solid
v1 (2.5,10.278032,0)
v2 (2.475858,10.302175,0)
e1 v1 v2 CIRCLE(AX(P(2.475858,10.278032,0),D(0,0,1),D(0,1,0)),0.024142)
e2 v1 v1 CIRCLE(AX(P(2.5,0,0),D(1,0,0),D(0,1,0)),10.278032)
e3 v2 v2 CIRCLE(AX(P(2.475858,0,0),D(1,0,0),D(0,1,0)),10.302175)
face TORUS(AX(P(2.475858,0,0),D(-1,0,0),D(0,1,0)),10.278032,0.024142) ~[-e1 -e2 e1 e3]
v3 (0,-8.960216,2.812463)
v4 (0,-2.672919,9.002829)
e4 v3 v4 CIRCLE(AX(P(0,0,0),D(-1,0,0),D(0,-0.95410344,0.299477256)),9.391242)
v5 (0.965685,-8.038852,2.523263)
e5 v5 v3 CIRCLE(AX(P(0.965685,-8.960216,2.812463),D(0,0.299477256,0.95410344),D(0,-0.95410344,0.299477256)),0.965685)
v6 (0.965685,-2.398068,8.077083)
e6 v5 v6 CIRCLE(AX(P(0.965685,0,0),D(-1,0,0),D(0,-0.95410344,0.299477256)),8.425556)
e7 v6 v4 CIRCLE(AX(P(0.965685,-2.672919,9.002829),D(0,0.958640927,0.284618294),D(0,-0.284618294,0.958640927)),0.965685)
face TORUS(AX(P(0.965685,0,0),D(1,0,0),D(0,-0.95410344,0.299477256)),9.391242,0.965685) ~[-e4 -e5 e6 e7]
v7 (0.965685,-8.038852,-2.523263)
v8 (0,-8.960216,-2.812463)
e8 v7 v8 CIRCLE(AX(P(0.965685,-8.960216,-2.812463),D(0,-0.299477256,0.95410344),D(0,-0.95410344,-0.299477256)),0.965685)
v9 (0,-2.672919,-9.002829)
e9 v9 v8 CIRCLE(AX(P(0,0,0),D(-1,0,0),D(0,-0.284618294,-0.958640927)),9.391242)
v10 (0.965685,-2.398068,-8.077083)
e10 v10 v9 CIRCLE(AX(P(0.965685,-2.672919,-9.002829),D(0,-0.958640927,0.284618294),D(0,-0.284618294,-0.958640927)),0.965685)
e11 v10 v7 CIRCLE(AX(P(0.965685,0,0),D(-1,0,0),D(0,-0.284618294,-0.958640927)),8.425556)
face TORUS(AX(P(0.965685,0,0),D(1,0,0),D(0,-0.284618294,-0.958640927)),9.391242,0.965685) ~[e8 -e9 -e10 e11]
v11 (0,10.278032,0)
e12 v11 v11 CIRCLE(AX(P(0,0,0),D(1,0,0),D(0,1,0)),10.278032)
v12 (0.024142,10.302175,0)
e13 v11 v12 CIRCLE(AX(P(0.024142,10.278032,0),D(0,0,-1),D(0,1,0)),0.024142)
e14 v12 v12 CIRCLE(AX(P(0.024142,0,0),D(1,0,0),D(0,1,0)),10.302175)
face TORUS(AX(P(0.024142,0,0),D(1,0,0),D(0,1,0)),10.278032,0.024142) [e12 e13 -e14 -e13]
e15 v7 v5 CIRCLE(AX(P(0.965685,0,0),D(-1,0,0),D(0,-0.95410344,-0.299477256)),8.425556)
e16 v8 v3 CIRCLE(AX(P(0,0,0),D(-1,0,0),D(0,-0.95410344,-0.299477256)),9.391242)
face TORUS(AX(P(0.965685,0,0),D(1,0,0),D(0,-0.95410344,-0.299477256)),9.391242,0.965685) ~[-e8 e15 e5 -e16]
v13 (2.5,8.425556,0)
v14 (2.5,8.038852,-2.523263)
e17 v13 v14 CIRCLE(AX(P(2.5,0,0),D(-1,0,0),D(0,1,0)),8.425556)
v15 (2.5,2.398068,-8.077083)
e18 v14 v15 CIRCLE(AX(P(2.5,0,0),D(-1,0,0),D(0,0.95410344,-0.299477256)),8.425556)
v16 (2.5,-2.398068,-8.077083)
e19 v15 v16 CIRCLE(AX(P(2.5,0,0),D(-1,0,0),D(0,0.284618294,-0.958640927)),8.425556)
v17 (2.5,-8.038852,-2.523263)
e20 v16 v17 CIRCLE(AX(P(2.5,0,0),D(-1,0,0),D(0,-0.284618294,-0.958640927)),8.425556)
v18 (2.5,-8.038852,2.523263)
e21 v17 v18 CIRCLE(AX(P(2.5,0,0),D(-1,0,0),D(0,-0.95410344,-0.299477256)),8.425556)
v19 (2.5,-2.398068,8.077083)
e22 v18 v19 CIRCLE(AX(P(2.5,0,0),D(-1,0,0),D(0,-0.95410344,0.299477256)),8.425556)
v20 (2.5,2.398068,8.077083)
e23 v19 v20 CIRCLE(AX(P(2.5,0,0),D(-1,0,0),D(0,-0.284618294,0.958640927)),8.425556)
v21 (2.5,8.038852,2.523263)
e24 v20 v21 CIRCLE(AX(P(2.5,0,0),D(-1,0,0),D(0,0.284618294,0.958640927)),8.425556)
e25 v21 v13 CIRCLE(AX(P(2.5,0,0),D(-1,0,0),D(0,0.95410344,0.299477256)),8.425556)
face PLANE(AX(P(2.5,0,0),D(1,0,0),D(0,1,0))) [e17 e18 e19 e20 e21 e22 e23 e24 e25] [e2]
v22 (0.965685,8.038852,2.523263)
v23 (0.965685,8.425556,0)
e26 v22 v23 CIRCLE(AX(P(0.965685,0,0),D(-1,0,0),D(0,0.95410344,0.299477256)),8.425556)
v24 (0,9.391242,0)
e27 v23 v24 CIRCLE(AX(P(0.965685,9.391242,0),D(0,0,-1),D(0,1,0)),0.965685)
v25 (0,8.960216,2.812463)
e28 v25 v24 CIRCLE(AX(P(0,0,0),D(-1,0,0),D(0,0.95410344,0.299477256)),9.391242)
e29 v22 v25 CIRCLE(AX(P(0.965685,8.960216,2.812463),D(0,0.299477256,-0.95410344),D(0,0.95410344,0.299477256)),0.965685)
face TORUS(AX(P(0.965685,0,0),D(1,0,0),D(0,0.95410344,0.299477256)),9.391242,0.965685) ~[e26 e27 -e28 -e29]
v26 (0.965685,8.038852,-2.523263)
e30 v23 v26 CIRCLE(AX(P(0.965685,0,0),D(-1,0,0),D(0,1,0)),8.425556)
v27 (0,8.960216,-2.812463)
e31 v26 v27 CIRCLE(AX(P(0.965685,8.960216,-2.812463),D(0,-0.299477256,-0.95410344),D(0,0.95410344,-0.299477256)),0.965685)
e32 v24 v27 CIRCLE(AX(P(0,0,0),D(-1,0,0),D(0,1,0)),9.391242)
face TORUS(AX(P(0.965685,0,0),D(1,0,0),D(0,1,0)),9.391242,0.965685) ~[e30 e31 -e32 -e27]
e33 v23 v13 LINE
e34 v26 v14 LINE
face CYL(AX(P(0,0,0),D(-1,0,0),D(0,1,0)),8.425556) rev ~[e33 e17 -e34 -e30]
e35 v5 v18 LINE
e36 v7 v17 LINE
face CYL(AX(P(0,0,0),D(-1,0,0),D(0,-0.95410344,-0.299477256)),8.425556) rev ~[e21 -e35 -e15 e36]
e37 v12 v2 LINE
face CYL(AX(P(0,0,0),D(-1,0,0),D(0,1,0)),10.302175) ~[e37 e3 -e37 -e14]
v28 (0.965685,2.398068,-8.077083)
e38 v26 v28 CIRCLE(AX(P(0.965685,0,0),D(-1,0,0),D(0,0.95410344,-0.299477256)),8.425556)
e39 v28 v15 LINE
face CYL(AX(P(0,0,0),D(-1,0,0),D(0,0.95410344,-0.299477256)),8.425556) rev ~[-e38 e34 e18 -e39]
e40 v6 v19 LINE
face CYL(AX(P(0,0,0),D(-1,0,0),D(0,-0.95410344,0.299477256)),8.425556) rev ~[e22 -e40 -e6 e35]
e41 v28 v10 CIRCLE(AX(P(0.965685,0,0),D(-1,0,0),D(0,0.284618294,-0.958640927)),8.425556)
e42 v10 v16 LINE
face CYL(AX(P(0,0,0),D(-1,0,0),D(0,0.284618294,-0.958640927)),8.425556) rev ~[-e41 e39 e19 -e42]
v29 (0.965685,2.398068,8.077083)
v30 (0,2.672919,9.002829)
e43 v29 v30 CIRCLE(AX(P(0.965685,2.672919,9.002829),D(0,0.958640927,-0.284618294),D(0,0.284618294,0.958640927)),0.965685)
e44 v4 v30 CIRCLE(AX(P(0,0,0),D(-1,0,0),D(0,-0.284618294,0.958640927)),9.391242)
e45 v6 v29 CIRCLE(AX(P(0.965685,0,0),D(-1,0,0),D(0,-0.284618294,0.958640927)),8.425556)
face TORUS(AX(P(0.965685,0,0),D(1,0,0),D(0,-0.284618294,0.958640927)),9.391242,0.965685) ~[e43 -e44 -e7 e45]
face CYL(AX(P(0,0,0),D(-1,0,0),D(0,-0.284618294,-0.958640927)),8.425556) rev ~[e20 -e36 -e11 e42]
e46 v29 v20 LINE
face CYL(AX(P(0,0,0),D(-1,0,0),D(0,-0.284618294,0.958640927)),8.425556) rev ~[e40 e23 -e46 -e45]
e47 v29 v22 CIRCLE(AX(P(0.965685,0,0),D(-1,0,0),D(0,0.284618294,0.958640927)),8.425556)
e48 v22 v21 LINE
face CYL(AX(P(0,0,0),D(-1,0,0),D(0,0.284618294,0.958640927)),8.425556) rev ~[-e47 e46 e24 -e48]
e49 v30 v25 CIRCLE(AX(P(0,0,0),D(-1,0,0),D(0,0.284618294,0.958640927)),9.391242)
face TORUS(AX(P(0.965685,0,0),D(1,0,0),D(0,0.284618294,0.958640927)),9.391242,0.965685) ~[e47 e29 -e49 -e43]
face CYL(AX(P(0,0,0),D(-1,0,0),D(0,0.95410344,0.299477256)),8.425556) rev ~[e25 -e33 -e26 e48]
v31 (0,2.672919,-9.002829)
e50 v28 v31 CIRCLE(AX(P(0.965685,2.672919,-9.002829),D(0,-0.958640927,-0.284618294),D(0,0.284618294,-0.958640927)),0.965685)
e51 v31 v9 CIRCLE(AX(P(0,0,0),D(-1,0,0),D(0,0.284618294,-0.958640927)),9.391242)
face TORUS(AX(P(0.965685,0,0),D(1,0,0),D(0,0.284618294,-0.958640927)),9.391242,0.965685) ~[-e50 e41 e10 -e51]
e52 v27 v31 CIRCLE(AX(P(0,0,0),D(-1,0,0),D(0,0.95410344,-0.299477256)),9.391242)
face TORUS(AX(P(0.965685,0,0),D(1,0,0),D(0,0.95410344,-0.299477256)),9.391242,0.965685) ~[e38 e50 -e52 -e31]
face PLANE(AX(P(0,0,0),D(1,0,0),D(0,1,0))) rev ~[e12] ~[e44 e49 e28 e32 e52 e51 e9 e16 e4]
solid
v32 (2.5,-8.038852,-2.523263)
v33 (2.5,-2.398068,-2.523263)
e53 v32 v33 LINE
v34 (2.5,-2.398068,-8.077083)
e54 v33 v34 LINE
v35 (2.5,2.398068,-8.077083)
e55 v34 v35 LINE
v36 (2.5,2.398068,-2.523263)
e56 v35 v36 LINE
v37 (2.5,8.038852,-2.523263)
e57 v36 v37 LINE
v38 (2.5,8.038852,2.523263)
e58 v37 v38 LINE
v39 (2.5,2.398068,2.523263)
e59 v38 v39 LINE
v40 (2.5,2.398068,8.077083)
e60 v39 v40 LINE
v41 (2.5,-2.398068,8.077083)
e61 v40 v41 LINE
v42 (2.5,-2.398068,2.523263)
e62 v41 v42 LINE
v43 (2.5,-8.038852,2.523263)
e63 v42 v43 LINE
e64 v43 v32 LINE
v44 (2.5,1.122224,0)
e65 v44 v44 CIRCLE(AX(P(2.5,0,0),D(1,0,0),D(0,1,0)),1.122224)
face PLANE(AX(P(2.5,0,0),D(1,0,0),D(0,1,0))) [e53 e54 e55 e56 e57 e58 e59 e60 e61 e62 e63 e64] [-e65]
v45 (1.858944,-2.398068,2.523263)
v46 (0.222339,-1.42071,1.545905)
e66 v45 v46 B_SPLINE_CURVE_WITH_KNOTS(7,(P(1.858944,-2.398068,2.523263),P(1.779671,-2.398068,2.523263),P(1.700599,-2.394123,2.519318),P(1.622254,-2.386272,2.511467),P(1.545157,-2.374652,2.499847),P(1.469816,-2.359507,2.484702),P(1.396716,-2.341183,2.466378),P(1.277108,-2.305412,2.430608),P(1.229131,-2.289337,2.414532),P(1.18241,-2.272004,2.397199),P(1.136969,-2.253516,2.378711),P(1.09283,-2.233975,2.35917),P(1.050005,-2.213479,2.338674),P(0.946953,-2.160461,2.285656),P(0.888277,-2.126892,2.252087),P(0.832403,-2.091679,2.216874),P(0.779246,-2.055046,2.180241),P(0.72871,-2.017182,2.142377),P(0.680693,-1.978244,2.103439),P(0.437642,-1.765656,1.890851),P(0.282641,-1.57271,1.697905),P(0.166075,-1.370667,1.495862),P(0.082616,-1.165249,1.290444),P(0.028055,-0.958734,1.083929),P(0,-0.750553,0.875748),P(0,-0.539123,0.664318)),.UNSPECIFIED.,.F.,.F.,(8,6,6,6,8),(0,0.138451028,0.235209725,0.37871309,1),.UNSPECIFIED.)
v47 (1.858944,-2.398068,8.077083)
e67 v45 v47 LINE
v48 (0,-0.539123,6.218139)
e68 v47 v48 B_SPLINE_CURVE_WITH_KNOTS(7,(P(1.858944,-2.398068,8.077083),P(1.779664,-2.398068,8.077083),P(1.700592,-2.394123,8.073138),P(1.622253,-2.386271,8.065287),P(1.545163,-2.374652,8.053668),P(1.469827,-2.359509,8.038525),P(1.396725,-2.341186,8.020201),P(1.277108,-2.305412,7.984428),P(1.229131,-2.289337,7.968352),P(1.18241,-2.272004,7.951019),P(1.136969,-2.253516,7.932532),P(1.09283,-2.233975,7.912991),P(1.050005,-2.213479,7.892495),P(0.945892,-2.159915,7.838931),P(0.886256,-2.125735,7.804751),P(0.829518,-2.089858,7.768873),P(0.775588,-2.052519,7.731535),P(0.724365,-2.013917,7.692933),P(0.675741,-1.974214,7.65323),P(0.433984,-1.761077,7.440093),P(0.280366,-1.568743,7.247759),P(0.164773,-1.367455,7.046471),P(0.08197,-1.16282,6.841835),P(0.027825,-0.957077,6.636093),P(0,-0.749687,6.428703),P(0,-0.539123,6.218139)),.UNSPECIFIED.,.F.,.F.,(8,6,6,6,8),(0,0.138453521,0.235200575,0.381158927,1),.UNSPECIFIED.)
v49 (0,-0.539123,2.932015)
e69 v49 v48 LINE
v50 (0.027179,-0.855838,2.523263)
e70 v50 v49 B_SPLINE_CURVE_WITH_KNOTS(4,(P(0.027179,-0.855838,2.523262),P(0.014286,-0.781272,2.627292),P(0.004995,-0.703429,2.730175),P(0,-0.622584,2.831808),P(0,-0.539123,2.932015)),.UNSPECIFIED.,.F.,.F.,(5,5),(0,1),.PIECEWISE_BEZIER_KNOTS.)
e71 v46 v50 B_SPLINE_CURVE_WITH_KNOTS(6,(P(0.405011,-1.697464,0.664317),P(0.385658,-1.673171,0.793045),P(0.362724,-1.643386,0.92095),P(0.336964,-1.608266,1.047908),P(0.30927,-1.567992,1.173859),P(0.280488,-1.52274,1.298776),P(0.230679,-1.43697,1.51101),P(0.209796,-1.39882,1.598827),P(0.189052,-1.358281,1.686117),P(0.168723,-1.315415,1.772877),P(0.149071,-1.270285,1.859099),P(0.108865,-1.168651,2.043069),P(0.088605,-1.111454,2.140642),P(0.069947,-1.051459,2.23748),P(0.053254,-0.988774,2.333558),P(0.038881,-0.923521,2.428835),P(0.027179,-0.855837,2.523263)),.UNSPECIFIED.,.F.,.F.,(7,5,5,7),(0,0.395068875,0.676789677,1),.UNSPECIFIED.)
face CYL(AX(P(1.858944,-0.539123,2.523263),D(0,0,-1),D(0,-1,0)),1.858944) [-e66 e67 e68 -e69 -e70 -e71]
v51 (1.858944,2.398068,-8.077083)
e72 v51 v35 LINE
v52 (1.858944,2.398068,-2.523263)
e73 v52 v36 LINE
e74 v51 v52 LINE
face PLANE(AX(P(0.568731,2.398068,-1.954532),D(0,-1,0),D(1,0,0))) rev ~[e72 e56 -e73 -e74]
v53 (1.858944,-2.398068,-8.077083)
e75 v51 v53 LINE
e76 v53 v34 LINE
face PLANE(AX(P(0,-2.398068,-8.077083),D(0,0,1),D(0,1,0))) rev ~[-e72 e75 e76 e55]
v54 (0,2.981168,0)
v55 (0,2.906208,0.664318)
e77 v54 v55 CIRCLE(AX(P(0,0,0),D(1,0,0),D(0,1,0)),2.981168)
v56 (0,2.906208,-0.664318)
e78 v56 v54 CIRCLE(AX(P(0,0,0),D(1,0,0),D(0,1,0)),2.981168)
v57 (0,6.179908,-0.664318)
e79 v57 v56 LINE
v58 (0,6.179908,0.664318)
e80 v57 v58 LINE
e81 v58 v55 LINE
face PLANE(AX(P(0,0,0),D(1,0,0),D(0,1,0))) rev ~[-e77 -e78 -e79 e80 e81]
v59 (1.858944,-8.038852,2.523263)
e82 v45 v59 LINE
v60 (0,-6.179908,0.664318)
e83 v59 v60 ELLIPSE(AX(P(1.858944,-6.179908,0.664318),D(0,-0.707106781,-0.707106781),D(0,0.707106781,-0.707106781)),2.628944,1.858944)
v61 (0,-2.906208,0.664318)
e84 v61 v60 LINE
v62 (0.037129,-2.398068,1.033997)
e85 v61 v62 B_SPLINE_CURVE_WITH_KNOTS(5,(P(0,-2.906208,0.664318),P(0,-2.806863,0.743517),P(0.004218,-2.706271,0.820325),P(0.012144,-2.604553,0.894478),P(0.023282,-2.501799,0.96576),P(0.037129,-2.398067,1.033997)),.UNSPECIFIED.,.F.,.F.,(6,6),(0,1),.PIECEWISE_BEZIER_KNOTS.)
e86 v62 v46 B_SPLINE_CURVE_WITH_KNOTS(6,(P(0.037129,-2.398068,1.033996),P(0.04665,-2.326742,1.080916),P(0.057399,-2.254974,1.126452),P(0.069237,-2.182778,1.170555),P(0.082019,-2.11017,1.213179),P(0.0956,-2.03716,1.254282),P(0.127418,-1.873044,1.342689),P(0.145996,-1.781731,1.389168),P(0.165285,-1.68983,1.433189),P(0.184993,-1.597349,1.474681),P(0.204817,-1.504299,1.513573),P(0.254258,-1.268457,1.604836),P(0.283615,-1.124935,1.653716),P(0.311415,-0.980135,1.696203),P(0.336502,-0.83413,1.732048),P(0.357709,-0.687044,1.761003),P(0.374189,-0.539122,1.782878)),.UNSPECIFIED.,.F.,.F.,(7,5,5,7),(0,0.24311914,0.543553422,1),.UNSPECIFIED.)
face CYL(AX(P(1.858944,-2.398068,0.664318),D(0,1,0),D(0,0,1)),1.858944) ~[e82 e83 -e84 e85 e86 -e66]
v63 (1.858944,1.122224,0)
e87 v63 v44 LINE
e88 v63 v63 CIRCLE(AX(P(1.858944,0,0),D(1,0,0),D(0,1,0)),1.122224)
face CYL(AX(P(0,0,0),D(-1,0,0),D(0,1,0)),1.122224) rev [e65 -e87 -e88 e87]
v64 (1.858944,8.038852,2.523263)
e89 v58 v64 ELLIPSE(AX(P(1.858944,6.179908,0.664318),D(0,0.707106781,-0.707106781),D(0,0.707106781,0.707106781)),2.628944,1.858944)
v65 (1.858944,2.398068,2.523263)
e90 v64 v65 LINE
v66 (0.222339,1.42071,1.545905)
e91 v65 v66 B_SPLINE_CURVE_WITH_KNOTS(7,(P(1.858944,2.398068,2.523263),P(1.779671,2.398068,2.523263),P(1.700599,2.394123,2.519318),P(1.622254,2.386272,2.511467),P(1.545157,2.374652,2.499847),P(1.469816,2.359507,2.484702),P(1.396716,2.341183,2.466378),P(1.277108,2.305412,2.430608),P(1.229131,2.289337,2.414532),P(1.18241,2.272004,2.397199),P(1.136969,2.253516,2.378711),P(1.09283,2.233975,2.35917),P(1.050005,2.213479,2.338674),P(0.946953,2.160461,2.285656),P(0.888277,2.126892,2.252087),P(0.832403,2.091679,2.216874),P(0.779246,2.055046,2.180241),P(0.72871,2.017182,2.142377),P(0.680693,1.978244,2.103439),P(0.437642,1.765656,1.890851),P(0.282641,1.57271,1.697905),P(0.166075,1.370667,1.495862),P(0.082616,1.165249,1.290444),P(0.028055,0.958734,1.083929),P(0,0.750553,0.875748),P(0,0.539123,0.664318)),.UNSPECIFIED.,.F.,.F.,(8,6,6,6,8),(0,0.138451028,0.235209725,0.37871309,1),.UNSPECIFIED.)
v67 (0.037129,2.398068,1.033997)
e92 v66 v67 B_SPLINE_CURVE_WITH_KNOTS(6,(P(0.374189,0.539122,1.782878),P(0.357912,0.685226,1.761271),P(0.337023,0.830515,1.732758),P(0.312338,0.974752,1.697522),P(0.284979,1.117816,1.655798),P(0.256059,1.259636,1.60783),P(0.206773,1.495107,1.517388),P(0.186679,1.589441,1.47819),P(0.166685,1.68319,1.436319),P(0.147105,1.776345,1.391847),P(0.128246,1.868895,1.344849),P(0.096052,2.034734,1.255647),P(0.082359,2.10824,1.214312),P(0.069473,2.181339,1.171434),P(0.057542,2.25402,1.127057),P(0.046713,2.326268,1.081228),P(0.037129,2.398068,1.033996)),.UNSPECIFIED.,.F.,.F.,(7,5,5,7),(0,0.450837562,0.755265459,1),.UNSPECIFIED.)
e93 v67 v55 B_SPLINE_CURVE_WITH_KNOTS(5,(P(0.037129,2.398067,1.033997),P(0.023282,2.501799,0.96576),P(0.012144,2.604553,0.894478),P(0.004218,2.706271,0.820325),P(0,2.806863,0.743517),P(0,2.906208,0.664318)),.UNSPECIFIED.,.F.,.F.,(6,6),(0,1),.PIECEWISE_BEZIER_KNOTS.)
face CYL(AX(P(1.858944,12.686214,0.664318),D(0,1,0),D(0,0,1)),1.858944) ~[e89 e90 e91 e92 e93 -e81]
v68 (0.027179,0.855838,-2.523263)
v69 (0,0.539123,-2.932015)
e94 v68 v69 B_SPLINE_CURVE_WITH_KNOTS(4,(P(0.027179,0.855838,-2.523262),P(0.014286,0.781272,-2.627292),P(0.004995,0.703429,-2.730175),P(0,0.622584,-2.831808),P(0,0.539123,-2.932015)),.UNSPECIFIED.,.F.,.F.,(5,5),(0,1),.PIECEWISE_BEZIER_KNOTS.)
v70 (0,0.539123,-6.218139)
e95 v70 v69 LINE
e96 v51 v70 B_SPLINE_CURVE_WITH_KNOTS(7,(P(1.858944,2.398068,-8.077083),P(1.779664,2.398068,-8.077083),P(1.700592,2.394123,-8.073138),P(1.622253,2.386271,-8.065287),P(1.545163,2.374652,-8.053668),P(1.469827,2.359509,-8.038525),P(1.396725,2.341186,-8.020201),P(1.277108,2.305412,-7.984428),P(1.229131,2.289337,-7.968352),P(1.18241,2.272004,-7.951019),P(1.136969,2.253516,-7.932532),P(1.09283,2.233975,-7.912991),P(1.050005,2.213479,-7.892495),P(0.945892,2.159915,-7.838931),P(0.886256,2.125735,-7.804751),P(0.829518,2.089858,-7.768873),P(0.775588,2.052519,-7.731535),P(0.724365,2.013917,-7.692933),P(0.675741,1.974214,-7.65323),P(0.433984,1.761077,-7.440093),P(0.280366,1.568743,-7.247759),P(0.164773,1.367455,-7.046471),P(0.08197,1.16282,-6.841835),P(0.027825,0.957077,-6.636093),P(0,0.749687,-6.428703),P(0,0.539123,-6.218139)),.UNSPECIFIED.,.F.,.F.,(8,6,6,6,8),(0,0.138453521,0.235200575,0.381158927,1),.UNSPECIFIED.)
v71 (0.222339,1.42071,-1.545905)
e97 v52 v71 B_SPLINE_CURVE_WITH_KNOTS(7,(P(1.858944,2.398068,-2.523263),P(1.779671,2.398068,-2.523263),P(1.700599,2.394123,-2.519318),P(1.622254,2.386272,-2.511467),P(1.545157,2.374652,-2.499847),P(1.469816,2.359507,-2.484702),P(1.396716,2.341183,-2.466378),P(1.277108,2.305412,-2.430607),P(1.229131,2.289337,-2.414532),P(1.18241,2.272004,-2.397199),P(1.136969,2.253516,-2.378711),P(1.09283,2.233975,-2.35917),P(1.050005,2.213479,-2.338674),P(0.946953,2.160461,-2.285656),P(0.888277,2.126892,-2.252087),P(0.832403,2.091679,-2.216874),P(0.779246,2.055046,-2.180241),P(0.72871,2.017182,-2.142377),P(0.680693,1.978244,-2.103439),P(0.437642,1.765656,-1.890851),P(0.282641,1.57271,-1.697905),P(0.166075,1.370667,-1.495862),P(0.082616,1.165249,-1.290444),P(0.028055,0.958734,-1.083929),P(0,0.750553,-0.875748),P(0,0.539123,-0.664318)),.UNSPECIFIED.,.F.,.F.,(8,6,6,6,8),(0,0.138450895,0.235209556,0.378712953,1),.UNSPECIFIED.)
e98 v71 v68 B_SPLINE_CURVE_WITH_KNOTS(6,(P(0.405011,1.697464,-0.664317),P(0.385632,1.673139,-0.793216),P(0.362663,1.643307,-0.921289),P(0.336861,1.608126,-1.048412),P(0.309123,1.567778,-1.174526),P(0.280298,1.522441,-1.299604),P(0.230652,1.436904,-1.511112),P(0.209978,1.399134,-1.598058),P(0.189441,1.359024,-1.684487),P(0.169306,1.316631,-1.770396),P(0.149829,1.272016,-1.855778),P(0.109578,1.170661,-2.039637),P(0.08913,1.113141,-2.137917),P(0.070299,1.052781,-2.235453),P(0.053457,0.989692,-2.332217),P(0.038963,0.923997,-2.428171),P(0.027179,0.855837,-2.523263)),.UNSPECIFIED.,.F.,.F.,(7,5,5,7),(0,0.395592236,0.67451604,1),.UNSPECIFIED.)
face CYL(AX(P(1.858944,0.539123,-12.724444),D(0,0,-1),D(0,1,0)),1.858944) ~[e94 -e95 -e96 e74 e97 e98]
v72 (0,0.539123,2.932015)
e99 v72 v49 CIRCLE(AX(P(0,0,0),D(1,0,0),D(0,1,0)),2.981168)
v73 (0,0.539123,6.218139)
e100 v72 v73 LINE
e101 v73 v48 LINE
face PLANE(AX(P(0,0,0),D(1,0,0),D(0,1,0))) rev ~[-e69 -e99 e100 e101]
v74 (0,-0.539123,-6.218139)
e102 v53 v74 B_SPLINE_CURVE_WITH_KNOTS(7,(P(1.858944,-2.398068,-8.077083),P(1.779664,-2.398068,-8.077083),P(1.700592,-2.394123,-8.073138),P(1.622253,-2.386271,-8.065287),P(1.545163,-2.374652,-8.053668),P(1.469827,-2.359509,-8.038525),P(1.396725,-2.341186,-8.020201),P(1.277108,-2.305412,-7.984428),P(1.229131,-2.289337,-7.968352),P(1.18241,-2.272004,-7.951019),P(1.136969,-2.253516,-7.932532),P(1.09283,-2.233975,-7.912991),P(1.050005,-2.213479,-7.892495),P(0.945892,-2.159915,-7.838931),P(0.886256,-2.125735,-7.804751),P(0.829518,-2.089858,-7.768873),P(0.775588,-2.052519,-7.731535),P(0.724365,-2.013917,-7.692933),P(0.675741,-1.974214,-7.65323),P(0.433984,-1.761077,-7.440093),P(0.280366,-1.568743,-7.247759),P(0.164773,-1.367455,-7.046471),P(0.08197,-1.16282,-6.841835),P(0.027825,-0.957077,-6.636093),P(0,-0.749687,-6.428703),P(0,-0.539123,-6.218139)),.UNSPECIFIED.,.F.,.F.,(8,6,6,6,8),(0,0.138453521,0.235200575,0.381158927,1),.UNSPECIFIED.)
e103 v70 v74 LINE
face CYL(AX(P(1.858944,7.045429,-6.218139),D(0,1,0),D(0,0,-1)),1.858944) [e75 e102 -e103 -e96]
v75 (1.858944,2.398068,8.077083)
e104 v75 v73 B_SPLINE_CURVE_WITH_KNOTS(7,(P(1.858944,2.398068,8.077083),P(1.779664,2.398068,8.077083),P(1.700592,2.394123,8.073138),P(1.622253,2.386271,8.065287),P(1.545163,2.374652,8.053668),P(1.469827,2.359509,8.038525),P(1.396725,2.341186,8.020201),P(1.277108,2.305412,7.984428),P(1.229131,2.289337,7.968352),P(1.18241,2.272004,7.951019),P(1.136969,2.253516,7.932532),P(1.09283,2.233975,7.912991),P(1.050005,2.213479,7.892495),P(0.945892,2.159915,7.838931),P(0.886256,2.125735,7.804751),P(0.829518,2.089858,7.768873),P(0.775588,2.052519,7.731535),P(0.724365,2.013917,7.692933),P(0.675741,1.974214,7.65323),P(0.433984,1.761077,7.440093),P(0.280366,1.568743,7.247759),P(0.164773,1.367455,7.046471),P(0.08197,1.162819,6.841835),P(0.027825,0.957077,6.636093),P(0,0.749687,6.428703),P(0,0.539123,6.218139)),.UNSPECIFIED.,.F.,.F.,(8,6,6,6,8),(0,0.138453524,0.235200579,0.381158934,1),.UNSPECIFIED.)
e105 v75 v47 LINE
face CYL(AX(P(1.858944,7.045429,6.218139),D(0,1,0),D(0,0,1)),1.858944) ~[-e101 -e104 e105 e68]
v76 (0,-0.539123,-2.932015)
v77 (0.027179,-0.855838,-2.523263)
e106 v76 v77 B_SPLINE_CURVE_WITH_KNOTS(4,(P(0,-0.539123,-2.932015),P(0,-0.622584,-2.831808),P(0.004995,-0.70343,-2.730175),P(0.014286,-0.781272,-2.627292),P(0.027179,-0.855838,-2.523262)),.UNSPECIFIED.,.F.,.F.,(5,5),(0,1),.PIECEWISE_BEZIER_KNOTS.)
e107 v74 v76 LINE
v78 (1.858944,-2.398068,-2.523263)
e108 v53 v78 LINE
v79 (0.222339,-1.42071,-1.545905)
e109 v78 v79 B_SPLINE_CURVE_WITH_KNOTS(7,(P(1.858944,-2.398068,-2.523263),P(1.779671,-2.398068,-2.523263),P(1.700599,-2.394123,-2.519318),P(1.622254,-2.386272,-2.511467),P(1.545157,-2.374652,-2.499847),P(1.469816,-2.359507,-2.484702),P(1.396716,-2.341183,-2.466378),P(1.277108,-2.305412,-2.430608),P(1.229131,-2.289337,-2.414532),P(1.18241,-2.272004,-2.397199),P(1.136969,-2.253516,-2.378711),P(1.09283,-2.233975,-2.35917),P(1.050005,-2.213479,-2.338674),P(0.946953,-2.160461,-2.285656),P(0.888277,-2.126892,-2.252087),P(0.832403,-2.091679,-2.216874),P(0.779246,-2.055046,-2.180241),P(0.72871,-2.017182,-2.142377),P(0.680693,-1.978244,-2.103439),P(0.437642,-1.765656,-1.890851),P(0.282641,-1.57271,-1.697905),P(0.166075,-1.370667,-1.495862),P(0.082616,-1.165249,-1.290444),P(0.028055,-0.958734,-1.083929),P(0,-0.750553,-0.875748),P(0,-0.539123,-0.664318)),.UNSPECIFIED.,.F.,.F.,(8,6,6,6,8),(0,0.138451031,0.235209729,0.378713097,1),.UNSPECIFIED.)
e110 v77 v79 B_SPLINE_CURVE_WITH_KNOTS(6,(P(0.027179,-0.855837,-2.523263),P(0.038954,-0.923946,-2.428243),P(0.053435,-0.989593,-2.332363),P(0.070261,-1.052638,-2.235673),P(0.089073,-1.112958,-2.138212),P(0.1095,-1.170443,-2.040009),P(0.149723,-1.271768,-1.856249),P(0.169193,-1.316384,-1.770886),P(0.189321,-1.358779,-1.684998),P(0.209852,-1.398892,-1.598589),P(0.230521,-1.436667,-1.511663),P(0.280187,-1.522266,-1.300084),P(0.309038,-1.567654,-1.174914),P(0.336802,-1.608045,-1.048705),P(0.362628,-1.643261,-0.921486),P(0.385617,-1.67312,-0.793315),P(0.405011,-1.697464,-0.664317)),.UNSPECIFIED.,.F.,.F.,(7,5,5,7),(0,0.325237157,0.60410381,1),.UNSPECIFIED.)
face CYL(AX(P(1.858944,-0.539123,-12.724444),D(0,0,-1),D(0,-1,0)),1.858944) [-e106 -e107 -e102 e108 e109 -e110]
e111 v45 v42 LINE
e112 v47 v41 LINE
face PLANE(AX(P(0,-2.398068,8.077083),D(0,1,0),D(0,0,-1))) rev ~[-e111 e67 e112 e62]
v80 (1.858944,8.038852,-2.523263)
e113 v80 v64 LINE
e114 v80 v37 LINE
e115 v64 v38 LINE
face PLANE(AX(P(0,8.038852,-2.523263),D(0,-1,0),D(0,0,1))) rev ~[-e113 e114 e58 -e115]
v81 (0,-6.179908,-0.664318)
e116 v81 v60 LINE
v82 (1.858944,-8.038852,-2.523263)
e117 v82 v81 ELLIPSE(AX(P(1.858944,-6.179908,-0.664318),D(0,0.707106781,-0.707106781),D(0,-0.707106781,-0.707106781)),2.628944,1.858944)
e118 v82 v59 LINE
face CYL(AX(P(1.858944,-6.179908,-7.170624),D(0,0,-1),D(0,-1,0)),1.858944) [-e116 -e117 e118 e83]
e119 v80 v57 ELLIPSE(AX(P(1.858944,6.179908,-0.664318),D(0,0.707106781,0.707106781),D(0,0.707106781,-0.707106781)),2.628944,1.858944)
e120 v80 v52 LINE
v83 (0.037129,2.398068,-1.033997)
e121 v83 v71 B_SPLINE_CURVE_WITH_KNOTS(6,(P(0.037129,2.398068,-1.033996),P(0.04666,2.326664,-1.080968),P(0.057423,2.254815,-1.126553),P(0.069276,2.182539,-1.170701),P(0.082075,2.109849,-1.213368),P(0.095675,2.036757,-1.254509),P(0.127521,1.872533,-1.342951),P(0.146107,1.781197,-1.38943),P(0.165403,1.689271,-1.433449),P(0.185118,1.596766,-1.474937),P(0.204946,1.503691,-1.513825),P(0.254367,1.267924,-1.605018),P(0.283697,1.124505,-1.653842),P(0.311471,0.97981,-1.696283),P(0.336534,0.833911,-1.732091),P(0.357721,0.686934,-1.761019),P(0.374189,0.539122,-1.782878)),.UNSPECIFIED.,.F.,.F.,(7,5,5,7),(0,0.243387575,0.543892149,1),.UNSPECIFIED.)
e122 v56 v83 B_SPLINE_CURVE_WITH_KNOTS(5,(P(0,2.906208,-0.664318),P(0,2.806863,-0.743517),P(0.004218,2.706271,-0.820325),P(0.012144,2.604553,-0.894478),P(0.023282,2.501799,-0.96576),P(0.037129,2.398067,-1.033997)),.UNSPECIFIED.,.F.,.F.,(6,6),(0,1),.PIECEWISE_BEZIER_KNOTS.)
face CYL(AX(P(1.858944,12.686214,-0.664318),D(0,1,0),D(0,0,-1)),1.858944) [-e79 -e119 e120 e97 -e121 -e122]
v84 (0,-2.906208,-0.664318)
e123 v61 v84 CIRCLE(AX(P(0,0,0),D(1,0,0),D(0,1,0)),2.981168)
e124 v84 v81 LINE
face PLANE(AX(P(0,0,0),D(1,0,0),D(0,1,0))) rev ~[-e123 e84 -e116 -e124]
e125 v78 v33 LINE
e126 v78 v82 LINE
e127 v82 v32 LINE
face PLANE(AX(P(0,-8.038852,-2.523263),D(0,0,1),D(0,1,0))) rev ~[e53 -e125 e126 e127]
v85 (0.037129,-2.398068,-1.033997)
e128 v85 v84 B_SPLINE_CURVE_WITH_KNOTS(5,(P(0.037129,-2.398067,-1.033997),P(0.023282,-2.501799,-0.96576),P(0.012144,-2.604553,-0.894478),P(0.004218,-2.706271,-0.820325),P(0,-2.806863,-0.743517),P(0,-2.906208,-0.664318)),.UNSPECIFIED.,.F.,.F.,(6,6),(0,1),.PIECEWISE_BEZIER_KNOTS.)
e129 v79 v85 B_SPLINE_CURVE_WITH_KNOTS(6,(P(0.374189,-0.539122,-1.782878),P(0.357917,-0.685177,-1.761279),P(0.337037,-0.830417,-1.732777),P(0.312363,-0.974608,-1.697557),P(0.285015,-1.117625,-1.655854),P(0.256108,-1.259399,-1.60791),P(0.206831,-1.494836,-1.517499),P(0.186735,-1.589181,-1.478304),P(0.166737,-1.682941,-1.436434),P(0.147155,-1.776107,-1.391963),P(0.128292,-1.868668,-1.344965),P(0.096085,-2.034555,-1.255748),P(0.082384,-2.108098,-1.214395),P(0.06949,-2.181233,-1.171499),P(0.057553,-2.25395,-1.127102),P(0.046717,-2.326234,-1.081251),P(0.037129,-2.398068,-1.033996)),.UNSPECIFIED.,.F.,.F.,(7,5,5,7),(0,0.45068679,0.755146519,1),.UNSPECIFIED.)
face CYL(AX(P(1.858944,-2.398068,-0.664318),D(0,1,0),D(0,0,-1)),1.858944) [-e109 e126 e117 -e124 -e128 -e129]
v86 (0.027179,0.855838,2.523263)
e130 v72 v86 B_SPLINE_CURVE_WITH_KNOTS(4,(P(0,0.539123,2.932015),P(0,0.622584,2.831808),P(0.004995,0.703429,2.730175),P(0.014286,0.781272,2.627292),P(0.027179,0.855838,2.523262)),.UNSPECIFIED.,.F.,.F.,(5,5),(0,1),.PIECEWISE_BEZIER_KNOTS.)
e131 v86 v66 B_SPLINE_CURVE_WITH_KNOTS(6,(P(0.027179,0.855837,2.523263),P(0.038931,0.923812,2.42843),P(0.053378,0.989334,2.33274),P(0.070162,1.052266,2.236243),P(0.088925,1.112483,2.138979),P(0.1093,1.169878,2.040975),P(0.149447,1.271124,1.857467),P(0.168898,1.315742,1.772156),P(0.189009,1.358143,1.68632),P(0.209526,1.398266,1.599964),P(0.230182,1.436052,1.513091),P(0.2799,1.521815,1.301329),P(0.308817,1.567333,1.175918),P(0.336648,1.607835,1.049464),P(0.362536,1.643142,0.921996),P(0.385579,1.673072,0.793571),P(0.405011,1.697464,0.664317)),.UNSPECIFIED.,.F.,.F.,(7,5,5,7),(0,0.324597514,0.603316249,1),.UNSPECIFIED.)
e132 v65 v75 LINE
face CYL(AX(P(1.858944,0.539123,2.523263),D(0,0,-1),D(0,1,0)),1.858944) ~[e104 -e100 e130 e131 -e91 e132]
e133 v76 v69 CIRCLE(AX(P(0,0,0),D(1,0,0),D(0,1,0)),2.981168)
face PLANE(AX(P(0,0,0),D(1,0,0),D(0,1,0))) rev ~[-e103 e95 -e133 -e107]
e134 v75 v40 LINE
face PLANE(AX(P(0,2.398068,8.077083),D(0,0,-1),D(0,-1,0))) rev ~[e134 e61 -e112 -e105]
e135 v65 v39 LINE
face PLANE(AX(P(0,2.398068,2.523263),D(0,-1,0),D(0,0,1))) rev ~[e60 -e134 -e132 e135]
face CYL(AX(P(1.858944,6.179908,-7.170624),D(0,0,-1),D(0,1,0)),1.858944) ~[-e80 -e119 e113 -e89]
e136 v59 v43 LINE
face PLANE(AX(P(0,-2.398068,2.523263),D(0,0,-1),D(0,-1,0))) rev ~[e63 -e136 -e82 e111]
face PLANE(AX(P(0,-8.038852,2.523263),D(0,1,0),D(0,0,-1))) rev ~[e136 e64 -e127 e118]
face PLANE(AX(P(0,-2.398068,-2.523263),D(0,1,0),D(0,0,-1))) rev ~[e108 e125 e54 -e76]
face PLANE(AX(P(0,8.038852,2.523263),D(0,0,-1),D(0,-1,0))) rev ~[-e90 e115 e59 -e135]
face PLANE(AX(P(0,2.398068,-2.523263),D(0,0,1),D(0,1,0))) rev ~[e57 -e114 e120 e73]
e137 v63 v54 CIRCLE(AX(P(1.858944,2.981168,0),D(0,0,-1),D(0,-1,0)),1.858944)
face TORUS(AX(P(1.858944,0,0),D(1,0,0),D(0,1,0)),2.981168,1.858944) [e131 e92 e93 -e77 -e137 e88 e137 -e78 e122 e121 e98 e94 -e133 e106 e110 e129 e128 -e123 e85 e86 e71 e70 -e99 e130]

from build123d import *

# Parameters (mm, degrees)
F0_R         = 10.3021745403
F1_DEPTH     = 2.5
F0_R_2       = 1.1222237914
F3_DEPTH     = 2.5
F4_T1_DEPTH  = 10.2881459995
F4_T3_DEPTH  = 14.3412472678
F4_T5_DEPTH  = 10.2011818375
F4_T7_DEPTH  = 14.0908572342
F4_T9_DEPTH  = 10.2881459995
F4_T11_DEPTH = 10.2011818375
F4_T19_DEPTH = 14.9355071071
F4_T23_DEPTH = 14.8485429451
F4_T30_DEPTH = 14.9355071071
F4_T34_DEPTH = 14.8485429451
F4_T41_DEPTH = 14.8485429451
F4_T45_DEPTH = 14.9355071071
F4_T52_DEPTH = 14.9355071071
F4_T56_DEPTH = 14.8485429451
F5_R         = 0.9656854249
F6_R         = 0.0241421356


# Not quite as in the source:
# - a fillet or chamfer that OpenCascade refuses, or shapes differently, is made with other operations: its cross-section is extruded or revolved along the edge and cut away or added
# - a feature of the source that left no trace in its solid (it failed there, or was rolled back) is left out


with BuildPart() as f1:
    # F0 (on Right) → F1 (new body)
    with BuildSketch(Plane.YZ):
        Circle(F0_R)
        with BuildLine():
            ThreePointArc((8.0388524015, 2.5232625263), (8.3283193537, 1.2763614112), (8.4255564629, 0))
            ThreePointArc((8.4255564629, 0), (8.3283193537, -1.2763614112), (8.0388524015, -2.5232625263))
            ThreePointArc((8.0388524015, -2.5232625263), (5.9113074258, -6.0038692713), (2.3980675096, -8.0770832563))
            ThreePointArc((2.3980675096, -8.0770832563), (0, -8.4255564629), (-2.3980675096, -8.0770832563))
            ThreePointArc((-2.3980675096, -8.0770832563), (-5.9113074258, -6.0038692713), (-8.0388524015, -2.5232625263))
            ThreePointArc((-8.0388524015, -2.5232625263), (-8.4255564629, 0), (-8.0388524015, 2.5232625263))
            ThreePointArc((-8.0388524015, 2.5232625263), (-5.9113074258, 6.0038692713), (-2.3980675096, 8.0770832563))
            ThreePointArc((-2.3980675096, 8.0770832563), (0, 8.4255564629), (2.3980675096, 8.0770832563))
            ThreePointArc((2.3980675096, 8.0770832563), (5.9113074258, 6.0038692713), (8.0388524015, 2.5232625263))
        make_face(mode=Mode.SUBTRACT)
    extrude(amount=F1_DEPTH)

    # F5
    f5_edges = [f1.edges().sort_by_distance(p)[0] for p in [
        (0, 8.038852, 2.523263),
    ]]
    fillet(f5_edges, radius=F5_R)

    # F6
    f6_edges = [f1.edges().sort_by_distance(p)[0] for p in [
        (1.25, 10.302175, 0),
        (0, -10.302175, 0),
        (2.5, -10.302175, 0),
    ]]
    fillet(f6_edges, radius=F6_R)


with BuildPart() as f3:
    # F0 (on Right) → F3 (new body)
    with BuildSketch(Plane.YZ):
        Polygon((8.0388524015, -2.5232625263), (8.0388524015, 2.5232625263), (2.3980675096, 2.5232625263), (2.3980675096, 8.0770832563), (-2.3980675096, 8.0770832563), (-2.3980675096, 2.5232625263), (-8.0388524015, 2.5232625263), (-8.0388524015, -2.5232625263), (-2.3980675096, -2.5232625263), (-2.3980675096, -8.0770832563), (2.3980675096, -8.0770832563), (2.3980675096, -2.5232625263), align=None)
        Circle(F0_R_2, mode=Mode.SUBTRACT)
    extrude(amount=F3_DEPTH)

    # F4: fillet of radius 1.858944443 on 13 edges, made by hand

    # F4_s2 → F4_t1 (cut)
    with BuildSketch(Plane.XZ.offset(-12.686213509)):
        with BuildLine():
            ThreePointArc((1.858944443, -2.5232625263), (0.5444722215, -1.9787903048), (0, -0.6643180833))
            Line((0, -0.6643180833), (0, -2.5232625263))
            Line((0, -2.5232625263), (1.858944443, -2.5232625263))
        make_face()
        with BuildLine():
            ThreePointArc((1.858944443, 2.5232625263), (0.5444722215, 1.9787903048), (0, 0.6643180833))
            Line((0, 0.6643180833), (0, 2.5232625263))
            Line((0, 2.5232625263), (1.858944443, 2.5232625263))
        make_face()
    extrude(amount=F4_T1_DEPTH, mode=Mode.SUBTRACT)

    # F4_s4 → F4_t3 (cut)
    with BuildSketch(Plane.XY.offset(-7.1706236339)):
        with BuildLine():
            ThreePointArc((1.858944443, 8.0388524015), (0.5444722215, 7.49438018), (0, 6.1799079584))
            Line((0, 6.1799079584), (0, 8.0388524015))
            Line((0, 8.0388524015), (1.858944443, 8.0388524015))
        make_face()
        with BuildLine():
            ThreePointArc((1.858944443, -8.0388524015), (0.5444722215, -7.49438018), (0, -6.1799079584))
            Line((0, -6.1799079584), (0, -8.0388524015))
            Line((0, -8.0388524015), (1.858944443, -8.0388524015))
        make_face()
    extrude(amount=F4_T3_DEPTH, mode=Mode.SUBTRACT)

    # F4_s6 → F4_t5 (cut)
    with BuildSketch(Plane.XY.offset(2.5232625263)):
        with BuildLine():
            ThreePointArc((1.858944443, 2.3980675096), (0.5444722215, 1.853595288), (0, 0.5391230665))
            Line((0, 0.5391230665), (0, 2.3980675096))
            Line((0, 2.3980675096), (1.858944443, 2.3980675096))
        make_face()
        with BuildLine():
            ThreePointArc((1.858944443, -2.3980675096), (0.5444722215, -1.853595288), (0, -0.5391230665))
            Line((0, -0.5391230665), (0, -2.3980675096))
            Line((0, -2.3980675096), (1.858944443, -2.3980675096))
        make_face()
    extrude(amount=F4_T5_DEPTH, mode=Mode.SUBTRACT)

    # F4_s8 → F4_t7 (cut)
    with BuildSketch(Plane.XZ.offset(-7.0454286171)):
        with BuildLine():
            ThreePointArc((1.858944443, 8.0770832563), (0.5444722215, 7.5326110348), (0, 6.2181388133))
            Line((0, 6.2181388133), (0, 8.0770832563))
            Line((0, 8.0770832563), (1.858944443, 8.0770832563))
        make_face()
        with BuildLine():
            ThreePointArc((1.858944443, -8.0770832563), (0.5444722215, -7.5326110348), (0, -6.2181388133))
            Line((0, -6.2181388133), (0, -8.0770832563))
            Line((0, -8.0770832563), (1.858944443, -8.0770832563))
        make_face()
    extrude(amount=F4_T7_DEPTH, mode=Mode.SUBTRACT)

    # F4_s10 → F4_t9 (cut)
    with BuildSketch(Plane.XZ.offset(2.3980675096)):
        with BuildLine():
            ThreePointArc((1.858944443, 2.5232625263), (0.5444722215, 1.9787903048), (0, 0.6643180833))
            Line((0, 0.6643180833), (0, 2.5232625263))
            Line((0, 2.5232625263), (1.858944443, 2.5232625263))
        make_face()
        with BuildLine():
            ThreePointArc((1.858944443, -2.5232625263), (0.5444722215, -1.9787903048), (0, -0.6643180833))
            Line((0, -0.6643180833), (0, -2.5232625263))
            Line((0, -2.5232625263), (1.858944443, -2.5232625263))
        make_face()
    extrude(amount=F4_T9_DEPTH, mode=Mode.SUBTRACT)

    # F4_s12 → F4_t11 (cut)
    with BuildSketch(Plane.XY.offset(-12.7244443639)):
        with BuildLine():
            ThreePointArc((1.858944443, -2.3980675096), (0.5444722215, -1.853595288), (0, -0.5391230665))
            Line((0, -0.5391230665), (0, -2.3980675096))
            Line((0, -2.3980675096), (1.858944443, -2.3980675096))
        make_face()
        with BuildLine():
            ThreePointArc((1.858944443, 2.3980675096), (0.5444722215, 1.853595288), (0, 0.5391230665))
            Line((0, 0.5391230665), (0, 2.3980675096))
            Line((0, 2.3980675096), (1.858944443, 2.3980675096))
        make_face()
    extrude(amount=F4_T11_DEPTH, mode=Mode.SUBTRACT)

    # F4_s13 → F4_t14 (revolve, cut)
    with BuildSketch(Plane.XY):
        with BuildLine():
            ThreePointArc((1.858944443, 1.1222237914), (0.5444722215, 1.666696013), (0, 2.9811682345))
            Line((0, 2.9811682345), (0, 1.1222237914))
            Line((0, 1.1222237914), (1.858944443, 1.1222237914))
        make_face()
    revolve(axis=Axis((0, 0, 0), (1, 0, 0)), mode=Mode.SUBTRACT)


with BuildPart() as f4_tool17:
    # F4_s18 → F4_t19 (new body)
    with BuildSketch(Plane.XZ.offset(2.249293598)):
        with BuildLine():
            ThreePointArc((1.858944443, -2.5232625263), (0.5444722215, -1.9787903048), (0, -0.6643180833))
            Line((0, -0.6643180833), (0, -2.5232625263))
            Line((0, -2.5232625263), (1.858944443, -2.5232625263))
        make_face()
    extrude(amount=-F4_T19_DEPTH)

    split(bisect_by=Plane.XZ.offset(-2.3980675096), keep=Keep.TOP)


with BuildPart() as f4_tool21:
    # F4_s22 → F4_t23 (new body)
    with BuildSketch(Plane.XY.offset(-12.7244443639)):
        with BuildLine():
            ThreePointArc((1.858944443, 2.3980675096), (0.5444722215, 1.853595288), (0, 0.5391230665))
            Line((0, 0.5391230665), (0, 2.3980675096))
            Line((0, 2.3980675096), (1.858944443, 2.3980675096))
        make_face()
    extrude(amount=F4_T23_DEPTH)

    split(bisect_by=Plane.XY.offset(-2.5232625263), keep=Keep.TOP)


with BuildPart() as f4_tool17_1:
    add(f4_tool17.part)

    # F4_t25: intersect F4_tool21
    add(f4_tool21.part, mode=Mode.INTERSECT)


with BuildPart() as f3_1:
    add(f3.part)

    # F4_t15: cut F4_tool17
    add(f4_tool17_1.part, mode=Mode.SUBTRACT)


with BuildPart() as f4_tool28:
    # F4_s29 → F4_t30 (new body)
    with BuildSketch(Plane.XZ.offset(-12.686213509)):
        with BuildLine():
            ThreePointArc((1.858944443, 2.5232625263), (0.5444722215, 1.9787903048), (0, 0.6643180833))
            Line((0, 0.6643180833), (0, 2.5232625263))
            Line((0, 2.5232625263), (1.858944443, 2.5232625263))
        make_face()
    extrude(amount=F4_T30_DEPTH)

    split(bisect_by=Plane.XZ.offset(-2.3980675096), keep=Keep.TOP)


with BuildPart() as f4_tool32:
    # F4_s33 → F4_t34 (new body)
    with BuildSketch(Plane.XY.offset(-2.1240985812)):
        with BuildLine():
            ThreePointArc((1.858944443, 2.3980675096), (0.5444722215, 1.853595288), (0, 0.5391230665))
            Line((0, 0.5391230665), (0, 2.3980675096))
            Line((0, 2.3980675096), (1.858944443, 2.3980675096))
        make_face()
    extrude(amount=F4_T34_DEPTH)

    split(bisect_by=Plane.XY.offset(2.5232625263), keep=Keep.BOTTOM)


with BuildPart() as f4_tool28_1:
    add(f4_tool28.part)

    # F4_t36: intersect F4_tool32
    add(f4_tool32.part, mode=Mode.INTERSECT)


with BuildPart() as f3_2:
    add(f3_1.part)

    # F4_t26: cut F4_tool28
    add(f4_tool28_1.part, mode=Mode.SUBTRACT)


with BuildPart() as f4_tool39:
    # F4_s40 → F4_t41 (new body)
    with BuildSketch(Plane.XY.offset(12.7244443639)):
        with BuildLine():
            ThreePointArc((1.858944443, -2.3980675096), (0.5444722215, -1.853595288), (0, -0.5391230665))
            Line((0, -0.5391230665), (0, -2.3980675096))
            Line((0, -2.3980675096), (1.858944443, -2.3980675096))
        make_face()
    extrude(amount=-F4_T41_DEPTH)

    split(bisect_by=Plane.XY.offset(2.5232625263), keep=Keep.BOTTOM)


with BuildPart() as f4_tool43:
    # F4_s44 → F4_t45 (new body)
    with BuildSketch(Plane.XZ.offset(-2.249293598)):
        with BuildLine():
            ThreePointArc((1.858944443, 2.5232625263), (0.5444722215, 1.9787903048), (0, 0.6643180833))
            Line((0, 0.6643180833), (0, 2.5232625263))
            Line((0, 2.5232625263), (1.858944443, 2.5232625263))
        make_face()
    extrude(amount=F4_T45_DEPTH)

    split(bisect_by=Plane.XZ.offset(2.3980675096), keep=Keep.BOTTOM)


with BuildPart() as f4_tool39_1:
    add(f4_tool39.part)

    # F4_t47: intersect F4_tool43
    add(f4_tool43.part, mode=Mode.INTERSECT)


with BuildPart() as f3_3:
    add(f3_2.part)

    # F4_t37: cut F4_tool39
    add(f4_tool39_1.part, mode=Mode.SUBTRACT)


with BuildPart() as f4_tool50:
    # F4_s51 → F4_t52 (new body)
    with BuildSketch(Plane.XZ.offset(12.686213509)):
        with BuildLine():
            ThreePointArc((1.858944443, -2.5232625263), (0.5444722215, -1.9787903048), (0, -0.6643180833))
            Line((0, -0.6643180833), (0, -2.5232625263))
            Line((0, -2.5232625263), (1.858944443, -2.5232625263))
        make_face()
    extrude(amount=-F4_T52_DEPTH)

    split(bisect_by=Plane.XZ.offset(2.3980675096), keep=Keep.BOTTOM)


with BuildPart() as f4_tool54:
    # F4_s55 → F4_t56 (new body)
    with BuildSketch(Plane.XY.offset(2.1240985812)):
        with BuildLine():
            ThreePointArc((1.858944443, -2.3980675096), (0.5444722215, -1.853595288), (0, -0.5391230665))
            Line((0, -0.5391230665), (0, -2.3980675096))
            Line((0, -2.3980675096), (1.858944443, -2.3980675096))
        make_face()
    extrude(amount=-F4_T56_DEPTH)

    split(bisect_by=Plane.XY.offset(-2.5232625263), keep=Keep.TOP)


with BuildPart() as f4_tool50_1:
    add(f4_tool50.part)

    # F4_t58: intersect F4_tool54
    add(f4_tool54.part, mode=Mode.INTERSECT)


with BuildPart() as f3_4:
    add(f3_3.part)

    # F4_t48: cut F4_tool50
    add(f4_tool50_1.part, mode=Mode.SUBTRACT)


solid = Compound([f1.part, f3_4.part])
